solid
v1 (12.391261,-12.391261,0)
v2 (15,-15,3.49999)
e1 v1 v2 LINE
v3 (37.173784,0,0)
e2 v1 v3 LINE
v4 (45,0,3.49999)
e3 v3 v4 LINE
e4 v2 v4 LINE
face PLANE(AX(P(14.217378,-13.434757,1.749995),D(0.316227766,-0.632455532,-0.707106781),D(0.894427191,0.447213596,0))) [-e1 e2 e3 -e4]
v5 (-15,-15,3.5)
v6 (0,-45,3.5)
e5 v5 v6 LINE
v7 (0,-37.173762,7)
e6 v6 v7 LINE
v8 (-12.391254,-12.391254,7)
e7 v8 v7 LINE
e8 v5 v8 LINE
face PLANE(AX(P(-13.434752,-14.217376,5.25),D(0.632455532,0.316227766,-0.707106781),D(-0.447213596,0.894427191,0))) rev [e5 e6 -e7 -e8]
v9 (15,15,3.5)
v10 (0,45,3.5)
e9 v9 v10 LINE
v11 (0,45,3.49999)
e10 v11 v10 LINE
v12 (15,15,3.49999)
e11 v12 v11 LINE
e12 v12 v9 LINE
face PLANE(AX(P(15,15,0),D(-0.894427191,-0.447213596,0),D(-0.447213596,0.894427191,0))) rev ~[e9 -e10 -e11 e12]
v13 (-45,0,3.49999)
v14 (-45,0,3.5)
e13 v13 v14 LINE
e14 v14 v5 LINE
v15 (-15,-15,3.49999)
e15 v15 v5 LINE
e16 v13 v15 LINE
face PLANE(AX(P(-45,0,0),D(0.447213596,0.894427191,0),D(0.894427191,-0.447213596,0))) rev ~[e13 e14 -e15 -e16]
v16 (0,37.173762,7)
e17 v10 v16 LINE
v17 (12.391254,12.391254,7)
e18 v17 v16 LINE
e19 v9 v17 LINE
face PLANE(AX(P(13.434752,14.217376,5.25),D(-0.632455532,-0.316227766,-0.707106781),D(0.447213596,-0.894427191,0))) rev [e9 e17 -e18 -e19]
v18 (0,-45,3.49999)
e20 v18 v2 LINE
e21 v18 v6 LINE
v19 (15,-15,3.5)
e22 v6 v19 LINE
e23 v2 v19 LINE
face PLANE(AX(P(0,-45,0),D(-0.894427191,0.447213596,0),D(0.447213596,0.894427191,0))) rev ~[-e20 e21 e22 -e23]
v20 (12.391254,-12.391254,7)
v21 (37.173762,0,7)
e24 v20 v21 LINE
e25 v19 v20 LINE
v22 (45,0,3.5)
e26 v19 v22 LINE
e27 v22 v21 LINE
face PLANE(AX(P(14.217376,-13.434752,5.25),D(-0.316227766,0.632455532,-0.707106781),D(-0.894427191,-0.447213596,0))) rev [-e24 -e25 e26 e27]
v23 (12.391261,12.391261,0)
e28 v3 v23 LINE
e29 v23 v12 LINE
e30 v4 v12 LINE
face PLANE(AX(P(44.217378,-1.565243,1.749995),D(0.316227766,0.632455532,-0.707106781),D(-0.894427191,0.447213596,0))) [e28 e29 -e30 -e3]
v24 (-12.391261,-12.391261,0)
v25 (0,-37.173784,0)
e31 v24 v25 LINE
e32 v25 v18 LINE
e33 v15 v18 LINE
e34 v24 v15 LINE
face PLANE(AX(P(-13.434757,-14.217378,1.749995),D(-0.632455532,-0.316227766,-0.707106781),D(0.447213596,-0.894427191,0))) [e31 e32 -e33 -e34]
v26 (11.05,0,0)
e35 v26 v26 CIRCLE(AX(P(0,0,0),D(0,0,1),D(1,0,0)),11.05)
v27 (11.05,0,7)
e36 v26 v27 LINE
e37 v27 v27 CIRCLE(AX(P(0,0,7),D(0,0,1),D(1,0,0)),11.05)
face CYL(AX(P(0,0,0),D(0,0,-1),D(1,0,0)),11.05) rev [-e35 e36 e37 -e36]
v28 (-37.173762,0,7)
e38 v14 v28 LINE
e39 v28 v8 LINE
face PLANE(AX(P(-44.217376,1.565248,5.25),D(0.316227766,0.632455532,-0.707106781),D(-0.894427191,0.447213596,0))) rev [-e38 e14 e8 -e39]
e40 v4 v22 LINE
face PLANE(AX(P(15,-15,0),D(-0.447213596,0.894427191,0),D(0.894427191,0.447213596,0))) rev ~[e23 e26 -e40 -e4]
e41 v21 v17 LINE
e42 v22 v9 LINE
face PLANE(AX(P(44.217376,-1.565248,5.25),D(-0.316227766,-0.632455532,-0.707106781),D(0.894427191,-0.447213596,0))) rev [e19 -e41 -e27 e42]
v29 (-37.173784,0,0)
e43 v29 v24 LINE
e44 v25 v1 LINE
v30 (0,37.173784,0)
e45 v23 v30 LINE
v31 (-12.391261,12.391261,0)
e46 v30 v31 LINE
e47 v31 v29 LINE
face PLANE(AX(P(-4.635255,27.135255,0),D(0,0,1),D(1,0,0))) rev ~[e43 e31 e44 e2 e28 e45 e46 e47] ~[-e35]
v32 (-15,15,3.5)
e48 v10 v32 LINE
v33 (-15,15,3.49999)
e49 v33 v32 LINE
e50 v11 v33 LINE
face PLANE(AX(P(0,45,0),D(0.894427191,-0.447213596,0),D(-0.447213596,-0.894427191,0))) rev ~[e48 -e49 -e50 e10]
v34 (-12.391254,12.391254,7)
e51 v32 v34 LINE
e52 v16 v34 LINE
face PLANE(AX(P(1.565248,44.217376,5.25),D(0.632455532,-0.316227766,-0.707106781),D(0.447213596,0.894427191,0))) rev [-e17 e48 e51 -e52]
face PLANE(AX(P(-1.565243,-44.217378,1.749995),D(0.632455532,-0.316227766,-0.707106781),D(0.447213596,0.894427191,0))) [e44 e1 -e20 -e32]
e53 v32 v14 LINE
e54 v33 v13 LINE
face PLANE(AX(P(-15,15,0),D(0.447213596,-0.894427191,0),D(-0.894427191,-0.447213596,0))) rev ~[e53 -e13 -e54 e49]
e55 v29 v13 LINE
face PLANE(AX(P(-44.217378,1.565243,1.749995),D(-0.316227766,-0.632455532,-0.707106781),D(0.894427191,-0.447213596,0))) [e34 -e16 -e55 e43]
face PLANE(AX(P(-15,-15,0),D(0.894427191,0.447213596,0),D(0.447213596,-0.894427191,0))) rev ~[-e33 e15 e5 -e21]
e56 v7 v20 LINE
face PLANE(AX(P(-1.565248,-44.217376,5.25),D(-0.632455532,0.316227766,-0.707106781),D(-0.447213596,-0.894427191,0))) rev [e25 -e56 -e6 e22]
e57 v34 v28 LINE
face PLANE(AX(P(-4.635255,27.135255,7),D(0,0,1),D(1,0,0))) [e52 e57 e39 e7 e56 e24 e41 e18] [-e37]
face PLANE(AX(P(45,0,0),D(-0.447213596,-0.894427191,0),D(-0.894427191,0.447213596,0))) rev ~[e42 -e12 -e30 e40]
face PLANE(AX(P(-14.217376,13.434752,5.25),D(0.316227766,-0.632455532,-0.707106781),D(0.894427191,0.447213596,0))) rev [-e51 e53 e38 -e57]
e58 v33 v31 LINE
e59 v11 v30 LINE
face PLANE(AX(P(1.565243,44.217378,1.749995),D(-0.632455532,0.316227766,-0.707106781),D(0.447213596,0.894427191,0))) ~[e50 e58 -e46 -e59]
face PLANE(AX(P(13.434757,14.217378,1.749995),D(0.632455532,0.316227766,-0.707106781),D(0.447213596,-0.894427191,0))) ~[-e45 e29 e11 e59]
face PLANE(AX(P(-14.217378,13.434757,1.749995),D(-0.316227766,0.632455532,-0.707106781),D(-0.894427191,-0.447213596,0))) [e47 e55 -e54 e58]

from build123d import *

# Parameters (mm, degrees)
F0_R     = 11.05
F1_DEPTH = 7
F2_SIZE  = 3.5
F3_SIZE  = 3.49999


# Not quite as in the source:
# - a fillet or chamfer is up to 0.001 mm smaller than in the source, because OpenCascade refuses the exact size


with BuildPart() as f1:
    # F0 (on Top) → F1 (new body)
    with BuildSketch(Plane.XY):
        Polygon((0, 45), (-15, 15), (0, 15), align=None)
        Polygon((0, 45), (0, 15), (15, 15), align=None)
        Polygon((0, 15), (-15, 15), (-15, 0), (-15, -15), (0, -15), (15, -15), (15, 0), (15, 15), align=None)
        Circle(F0_R, mode=Mode.SUBTRACT)
        Polygon((-15, -15), (-15, 0), (-45, 0), align=None)
        Polygon((-15, 0), (-15, 15), (-45, 0), align=None)
        Polygon((0, -15), (-15, -15), (0, -45), align=None)
        Polygon((15, -15), (0, -15), (0, -45), align=None)
        Polygon((45, 0), (15, 0), (15, -15), align=None)
        Polygon((45, 0), (15, 15), (15, 0), align=None)
    extrude(amount=F1_DEPTH)

    # F2
    f2_edges = [f1.edges().sort_by_distance(p)[0] for p in [
        (30, -7.5, 7),
        (7.5, -30, 7),
        (-7.5, -30, 7),
        (-30, -7.5, 7),
        (-30, 7.5, 7),
        (-7.5, 30, 7),
        (7.5, 30, 7),
        (30, 7.5, 7),
    ]]
    chamfer(f2_edges, length=F2_SIZE)

    # F3 (size 3.5 in the source; OpenCascade refuses exactly that, so slightly less here)
    f3_edges = [f1.edges().sort_by_distance(p)[0] for p in [
        (30, 7.5, 0),
        (7.5, 30, 0),
        (-7.5, 30, 0),
        (-30, 7.5, 0),
        (-30, -7.5, 0),
        (-7.5, -30, 0),
        (7.5, -30, 0),
        (30, -7.5, 0),
    ]]
    chamfer(f3_edges, length=F3_SIZE)


solid = f1.part
